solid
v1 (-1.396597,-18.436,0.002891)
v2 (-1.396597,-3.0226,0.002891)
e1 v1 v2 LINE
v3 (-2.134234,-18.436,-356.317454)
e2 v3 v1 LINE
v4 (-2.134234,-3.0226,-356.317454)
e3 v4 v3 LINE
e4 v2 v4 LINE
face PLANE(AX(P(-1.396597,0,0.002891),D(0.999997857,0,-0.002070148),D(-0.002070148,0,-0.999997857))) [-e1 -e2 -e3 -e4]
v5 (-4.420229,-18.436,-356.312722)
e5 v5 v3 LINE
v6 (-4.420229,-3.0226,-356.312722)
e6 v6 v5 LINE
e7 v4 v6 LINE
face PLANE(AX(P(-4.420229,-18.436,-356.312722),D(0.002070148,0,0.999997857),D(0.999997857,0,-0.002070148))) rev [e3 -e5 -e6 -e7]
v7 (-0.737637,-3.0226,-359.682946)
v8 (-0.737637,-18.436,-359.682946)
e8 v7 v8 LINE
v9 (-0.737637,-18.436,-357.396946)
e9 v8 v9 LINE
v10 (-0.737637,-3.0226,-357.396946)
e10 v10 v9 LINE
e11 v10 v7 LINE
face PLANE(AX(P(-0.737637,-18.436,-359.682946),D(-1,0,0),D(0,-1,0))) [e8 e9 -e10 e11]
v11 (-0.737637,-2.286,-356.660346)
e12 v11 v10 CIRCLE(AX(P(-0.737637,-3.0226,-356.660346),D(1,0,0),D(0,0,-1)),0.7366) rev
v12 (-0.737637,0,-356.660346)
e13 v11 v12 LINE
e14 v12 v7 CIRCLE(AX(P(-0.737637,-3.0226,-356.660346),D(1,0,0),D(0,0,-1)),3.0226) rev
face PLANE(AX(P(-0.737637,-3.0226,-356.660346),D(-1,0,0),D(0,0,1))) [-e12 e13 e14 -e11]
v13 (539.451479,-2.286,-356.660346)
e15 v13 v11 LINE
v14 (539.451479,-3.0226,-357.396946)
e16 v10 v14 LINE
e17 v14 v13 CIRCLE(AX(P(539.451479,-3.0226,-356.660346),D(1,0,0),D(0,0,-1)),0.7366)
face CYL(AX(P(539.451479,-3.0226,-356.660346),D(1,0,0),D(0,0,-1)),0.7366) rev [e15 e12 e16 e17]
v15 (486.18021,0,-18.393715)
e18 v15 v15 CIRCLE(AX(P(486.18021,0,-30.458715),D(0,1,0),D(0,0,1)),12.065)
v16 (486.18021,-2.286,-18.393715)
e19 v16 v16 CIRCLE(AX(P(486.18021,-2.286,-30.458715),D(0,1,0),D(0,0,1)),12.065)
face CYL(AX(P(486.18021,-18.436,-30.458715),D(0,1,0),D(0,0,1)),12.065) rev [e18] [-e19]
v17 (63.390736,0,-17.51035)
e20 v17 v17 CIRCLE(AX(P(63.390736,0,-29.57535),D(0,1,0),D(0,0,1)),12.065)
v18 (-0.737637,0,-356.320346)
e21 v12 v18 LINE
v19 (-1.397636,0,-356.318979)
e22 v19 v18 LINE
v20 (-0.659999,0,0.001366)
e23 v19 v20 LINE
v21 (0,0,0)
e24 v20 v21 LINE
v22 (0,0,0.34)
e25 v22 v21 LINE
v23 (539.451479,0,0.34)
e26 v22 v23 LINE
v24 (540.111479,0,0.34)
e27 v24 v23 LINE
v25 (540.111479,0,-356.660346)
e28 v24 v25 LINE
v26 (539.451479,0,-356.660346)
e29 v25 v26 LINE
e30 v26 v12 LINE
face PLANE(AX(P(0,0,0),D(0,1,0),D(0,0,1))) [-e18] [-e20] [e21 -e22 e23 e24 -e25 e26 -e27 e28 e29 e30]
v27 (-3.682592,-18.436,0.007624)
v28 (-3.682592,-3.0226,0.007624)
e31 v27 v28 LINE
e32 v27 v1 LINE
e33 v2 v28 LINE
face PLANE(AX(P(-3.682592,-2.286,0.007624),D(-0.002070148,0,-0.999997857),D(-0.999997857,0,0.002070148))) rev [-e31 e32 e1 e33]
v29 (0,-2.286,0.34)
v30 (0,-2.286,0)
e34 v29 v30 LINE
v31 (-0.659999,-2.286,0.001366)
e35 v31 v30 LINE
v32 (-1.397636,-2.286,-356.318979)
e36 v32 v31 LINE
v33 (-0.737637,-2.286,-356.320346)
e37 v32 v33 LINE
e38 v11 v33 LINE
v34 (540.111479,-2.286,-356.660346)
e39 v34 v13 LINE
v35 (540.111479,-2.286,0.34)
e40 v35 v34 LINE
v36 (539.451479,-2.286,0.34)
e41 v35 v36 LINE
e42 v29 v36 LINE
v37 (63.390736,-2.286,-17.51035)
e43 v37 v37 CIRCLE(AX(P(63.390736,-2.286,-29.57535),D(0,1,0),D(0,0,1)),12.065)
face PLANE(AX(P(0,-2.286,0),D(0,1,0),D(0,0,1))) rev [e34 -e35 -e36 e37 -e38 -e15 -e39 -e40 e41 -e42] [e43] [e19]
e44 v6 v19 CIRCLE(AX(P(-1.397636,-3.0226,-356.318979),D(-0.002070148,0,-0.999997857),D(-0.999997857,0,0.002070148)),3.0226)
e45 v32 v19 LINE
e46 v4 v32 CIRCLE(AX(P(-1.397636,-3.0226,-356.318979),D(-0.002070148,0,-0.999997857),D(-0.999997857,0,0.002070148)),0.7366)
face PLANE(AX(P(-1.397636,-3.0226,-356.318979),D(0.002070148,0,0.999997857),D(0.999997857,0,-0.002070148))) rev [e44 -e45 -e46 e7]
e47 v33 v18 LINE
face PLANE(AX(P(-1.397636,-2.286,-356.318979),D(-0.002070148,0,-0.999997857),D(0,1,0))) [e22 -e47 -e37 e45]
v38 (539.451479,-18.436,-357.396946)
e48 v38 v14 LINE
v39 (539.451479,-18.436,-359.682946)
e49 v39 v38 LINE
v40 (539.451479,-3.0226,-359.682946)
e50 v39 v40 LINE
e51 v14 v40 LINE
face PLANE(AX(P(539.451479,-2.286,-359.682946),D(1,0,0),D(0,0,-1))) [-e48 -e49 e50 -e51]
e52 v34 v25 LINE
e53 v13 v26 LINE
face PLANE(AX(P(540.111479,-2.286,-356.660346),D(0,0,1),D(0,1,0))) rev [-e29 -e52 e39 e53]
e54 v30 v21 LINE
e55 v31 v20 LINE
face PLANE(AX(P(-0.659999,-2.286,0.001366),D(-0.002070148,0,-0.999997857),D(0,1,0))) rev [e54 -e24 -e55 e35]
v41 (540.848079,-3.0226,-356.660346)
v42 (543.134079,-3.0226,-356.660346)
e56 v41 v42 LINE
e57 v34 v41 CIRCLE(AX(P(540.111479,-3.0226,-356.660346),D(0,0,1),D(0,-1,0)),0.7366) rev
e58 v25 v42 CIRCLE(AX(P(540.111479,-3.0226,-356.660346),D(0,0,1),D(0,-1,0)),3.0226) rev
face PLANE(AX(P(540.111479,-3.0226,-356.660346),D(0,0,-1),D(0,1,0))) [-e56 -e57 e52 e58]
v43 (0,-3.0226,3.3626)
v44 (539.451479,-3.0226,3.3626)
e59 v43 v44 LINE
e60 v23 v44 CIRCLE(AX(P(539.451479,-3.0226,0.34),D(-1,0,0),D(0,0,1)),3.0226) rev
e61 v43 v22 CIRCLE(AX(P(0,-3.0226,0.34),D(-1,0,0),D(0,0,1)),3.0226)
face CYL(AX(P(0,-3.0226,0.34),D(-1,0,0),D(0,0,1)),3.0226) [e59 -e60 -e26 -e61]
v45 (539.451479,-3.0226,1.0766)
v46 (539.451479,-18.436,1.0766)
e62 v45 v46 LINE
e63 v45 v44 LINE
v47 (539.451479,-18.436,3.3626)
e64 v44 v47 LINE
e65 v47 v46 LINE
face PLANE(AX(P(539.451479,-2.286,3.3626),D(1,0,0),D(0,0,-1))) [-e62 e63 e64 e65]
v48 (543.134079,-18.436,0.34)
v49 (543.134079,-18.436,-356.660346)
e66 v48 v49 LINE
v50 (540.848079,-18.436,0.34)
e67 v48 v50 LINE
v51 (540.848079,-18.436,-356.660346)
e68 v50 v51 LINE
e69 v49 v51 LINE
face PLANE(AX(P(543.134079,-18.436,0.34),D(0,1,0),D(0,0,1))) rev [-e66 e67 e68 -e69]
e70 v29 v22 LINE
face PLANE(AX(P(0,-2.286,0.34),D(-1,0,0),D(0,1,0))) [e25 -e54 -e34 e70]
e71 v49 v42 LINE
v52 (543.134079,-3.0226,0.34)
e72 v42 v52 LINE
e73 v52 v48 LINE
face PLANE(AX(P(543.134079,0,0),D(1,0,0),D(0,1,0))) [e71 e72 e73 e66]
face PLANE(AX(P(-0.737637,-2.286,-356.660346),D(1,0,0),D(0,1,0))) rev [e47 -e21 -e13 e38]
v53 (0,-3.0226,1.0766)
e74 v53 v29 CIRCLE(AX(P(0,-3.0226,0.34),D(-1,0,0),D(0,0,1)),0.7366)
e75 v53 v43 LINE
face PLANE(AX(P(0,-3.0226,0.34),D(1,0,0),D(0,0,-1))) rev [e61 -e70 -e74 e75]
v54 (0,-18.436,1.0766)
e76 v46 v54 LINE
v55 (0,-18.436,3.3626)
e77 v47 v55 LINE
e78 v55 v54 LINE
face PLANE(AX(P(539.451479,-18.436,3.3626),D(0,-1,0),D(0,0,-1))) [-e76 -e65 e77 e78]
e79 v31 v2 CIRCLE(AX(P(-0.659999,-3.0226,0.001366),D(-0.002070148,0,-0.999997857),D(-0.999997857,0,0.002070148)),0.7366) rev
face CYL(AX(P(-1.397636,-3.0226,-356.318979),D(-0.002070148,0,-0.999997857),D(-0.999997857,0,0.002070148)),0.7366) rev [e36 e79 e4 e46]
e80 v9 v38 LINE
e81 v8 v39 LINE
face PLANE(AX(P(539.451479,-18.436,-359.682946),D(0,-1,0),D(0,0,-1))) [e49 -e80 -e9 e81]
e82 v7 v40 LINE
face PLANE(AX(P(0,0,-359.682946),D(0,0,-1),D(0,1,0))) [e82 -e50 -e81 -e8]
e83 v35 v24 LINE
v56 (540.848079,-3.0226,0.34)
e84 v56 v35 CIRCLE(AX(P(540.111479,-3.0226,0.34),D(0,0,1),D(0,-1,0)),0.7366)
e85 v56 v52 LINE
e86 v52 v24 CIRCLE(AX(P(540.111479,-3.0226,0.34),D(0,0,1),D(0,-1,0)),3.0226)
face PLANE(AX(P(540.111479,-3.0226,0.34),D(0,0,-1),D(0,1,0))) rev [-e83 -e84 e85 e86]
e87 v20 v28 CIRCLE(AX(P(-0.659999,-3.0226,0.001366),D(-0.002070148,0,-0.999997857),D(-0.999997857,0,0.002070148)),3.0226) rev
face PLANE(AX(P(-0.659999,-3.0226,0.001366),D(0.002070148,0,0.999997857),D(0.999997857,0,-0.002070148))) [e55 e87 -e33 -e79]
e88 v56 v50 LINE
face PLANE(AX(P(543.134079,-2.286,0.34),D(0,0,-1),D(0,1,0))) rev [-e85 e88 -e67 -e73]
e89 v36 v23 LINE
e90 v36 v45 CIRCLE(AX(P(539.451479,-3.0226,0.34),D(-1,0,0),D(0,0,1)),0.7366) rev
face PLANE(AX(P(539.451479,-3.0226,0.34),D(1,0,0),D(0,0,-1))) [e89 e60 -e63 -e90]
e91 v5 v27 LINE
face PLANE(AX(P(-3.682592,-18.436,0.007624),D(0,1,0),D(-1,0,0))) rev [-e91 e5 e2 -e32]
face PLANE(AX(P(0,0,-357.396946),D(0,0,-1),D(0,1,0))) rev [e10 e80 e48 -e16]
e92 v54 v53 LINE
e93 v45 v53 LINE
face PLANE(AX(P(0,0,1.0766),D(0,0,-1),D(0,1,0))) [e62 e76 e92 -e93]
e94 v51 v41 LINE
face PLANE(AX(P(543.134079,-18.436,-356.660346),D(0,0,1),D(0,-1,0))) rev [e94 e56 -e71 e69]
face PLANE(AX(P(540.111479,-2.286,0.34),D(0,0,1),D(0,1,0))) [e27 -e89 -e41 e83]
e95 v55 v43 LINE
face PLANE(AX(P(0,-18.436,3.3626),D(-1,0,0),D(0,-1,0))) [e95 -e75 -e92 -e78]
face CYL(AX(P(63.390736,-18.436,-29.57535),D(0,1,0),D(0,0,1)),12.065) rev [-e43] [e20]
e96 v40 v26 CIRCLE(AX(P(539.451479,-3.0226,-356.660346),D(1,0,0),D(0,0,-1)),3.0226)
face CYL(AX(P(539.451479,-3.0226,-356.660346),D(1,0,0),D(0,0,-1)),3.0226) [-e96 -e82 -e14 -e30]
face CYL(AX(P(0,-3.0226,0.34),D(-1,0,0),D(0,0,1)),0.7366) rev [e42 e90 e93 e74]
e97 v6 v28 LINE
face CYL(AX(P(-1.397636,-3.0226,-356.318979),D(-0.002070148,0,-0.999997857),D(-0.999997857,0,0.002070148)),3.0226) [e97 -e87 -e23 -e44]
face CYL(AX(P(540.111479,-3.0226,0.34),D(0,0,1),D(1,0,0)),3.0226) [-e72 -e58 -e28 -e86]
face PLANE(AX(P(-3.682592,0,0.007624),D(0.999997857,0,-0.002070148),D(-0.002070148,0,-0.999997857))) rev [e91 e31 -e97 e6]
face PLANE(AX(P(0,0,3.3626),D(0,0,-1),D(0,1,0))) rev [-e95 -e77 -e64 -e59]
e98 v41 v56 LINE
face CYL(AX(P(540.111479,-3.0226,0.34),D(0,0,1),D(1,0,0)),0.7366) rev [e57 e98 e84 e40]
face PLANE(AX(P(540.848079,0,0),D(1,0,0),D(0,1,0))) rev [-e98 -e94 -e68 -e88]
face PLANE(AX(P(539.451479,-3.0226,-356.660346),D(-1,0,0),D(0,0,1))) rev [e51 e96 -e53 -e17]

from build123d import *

# Parameters (mm, degrees)
BASE_FLANGE1_DEPTH       = 2.286
EDGE_FLANGE17_DEPTH      = 540.189115874
EDGE_FLANGE17_BEND_DEPTH = 539.451478538
EDGE_FLANGE18_DEPTH      = 357.000345524
EDGE_FLANGE18_BEND_DEPTH = 356.321109034
SKETCH197_R              = 12.065
CUT_EXTRUDE1_DEPTH       = 652.69497057


# Sheet-metal steps are written as plain solids
with BuildPart() as part:
    # Sketch1 → Base-Flange1 (new body)
    with BuildSketch(Plane(origin=(0, 0, 0), x_dir=(1, 0, 0), z_dir=(0, 1, 0))):
        Polygon((539.451478538, 356.320345524), (0, 356.320345524), (-0.737637336, 356.320345524), (0, 0), (539.451478538, 0), align=None)
    extrude(amount=-BASE_FLANGE1_DEPTH)

    # Edge-Flange17 section (across the edge) → Edge-Flange17 (add)
    with BuildSketch(Plane(origin=(-0.737637336, -2.286, -357.396945524), x_dir=(0, 0, 1), z_dir=(1, 0, 0))):
        with BuildLine():
            Line((-2.286, 0.7366), (-2.286, 16.15))
            Line((-2.286, 16.15), (0, 16.15))
            Line((0, 16.15), (0, 0.7366))
            ThreePointArc((0, 0.7366), (0.215745145, 0.215745145), (0.7366, 0))
            Line((0.7366, 0), (1.0766, 0))
            Line((1.0766, 0), (1.0766, -2.286))
            Line((1.0766, -2.286), (0.7366, -2.286))
            ThreePointArc((0.7366, -2.286), (-1.400700957, -1.400700957), (-2.286, 0.7366))
        make_face()
    extrude(amount=EDGE_FLANGE17_DEPTH)

    # Edge-Flange17 section 2 (across the edge) → Edge-Flange17 bend (add)
    with BuildSketch(Plane(origin=(539.451478538, -2.286, 1.0766), x_dir=(0, 0, -1), z_dir=(-1, 0, 0))):
        with BuildLine():
            Line((-2.286, 0.7366), (-2.286, 16.15))
            Line((-2.286, 16.15), (0, 16.15))
            Line((0, 16.15), (0, 0.7366))
            ThreePointArc((0, 0.7366), (0.215745145, 0.215745145), (0.7366, 0))
            Line((0.7366, 0), (1.0766, 0))
            Line((1.0766, 0), (1.0766, -2.286))
            Line((1.0766, -2.286), (0.7366, -2.286))
            ThreePointArc((0.7366, -2.286), (-1.400700957, -1.400700957), (-2.286, 0.7366))
        make_face()
    extrude(amount=EDGE_FLANGE17_BEND_DEPTH)

    # Edge-Flange18 section (across the edge) → Edge-Flange18 (add)
    with BuildSketch(Plane(origin=(540.848078538, -2.286, -356.660345524), x_dir=(-1, 0, 0), z_dir=(0, 0, 1))):
        with BuildLine():
            Line((-2.286, 0.7366), (-2.286, 16.15))
            Line((-2.286, 16.15), (0, 16.15))
            Line((0, 16.15), (0, 0.7366))
            ThreePointArc((0, 0.7366), (0.215745145, 0.215745145), (0.7366, 0))
            Line((0.7366, 0), (1.3966, 0))
            Line((1.3966, 0), (1.3966, -2.286))
            Line((1.3966, -2.286), (0.7366, -2.286))
            ThreePointArc((0.7366, -2.286), (-1.400700957, -1.400700957), (-2.286, 0.7366))
        make_face()
    extrude(amount=EDGE_FLANGE18_DEPTH)

    # Edge-Flange18 section 2 (across the edge) → Edge-Flange18 bend (add)
    with BuildSketch(Plane(origin=(-1.396597007, -2.286, 0.002891168), x_dir=(0.9999978572418866, -3.4914813388431337e-15, -0.0020701477327567633), z_dir=(-0.0020701477327567633, 0, -0.9999978572418866))):
        with BuildLine():
            Line((-2.286, 0.7366), (-2.286, 16.15))
            Line((-2.286, 16.15), (0, 16.15))
            Line((0, 16.15), (0, 0.7366))
            ThreePointArc((0, 0.7366), (0.215745145, 0.215745145), (0.7366, 0))
            Line((0.7366, 0), (1.3966, 0))
            Line((1.3966, 0), (1.3966, -2.286))
            Line((1.3966, -2.286), (0.7366, -2.286))
            ThreePointArc((0.7366, -2.286), (-1.400700957, -1.400700957), (-2.286, 0.7366))
        make_face()
    extrude(amount=EDGE_FLANGE18_BEND_DEPTH)

    # Sketch197 → Cut-Extrude1 (cut, through all)
    with BuildSketch(Plane(origin=(0, 0, 0), x_dir=(1, 0, 0), z_dir=(0, 1, 0))):
        with Locations(Location((486.180210266, 30.458714935, 0), (0, 0, 270))):
            Circle(SKETCH197_R)
        with Locations(Location((63.390735832, 29.575349793, 0), (0, 0, 270))):
            Circle(SKETCH197_R)
    extrude(amount=-CUT_EXTRUDE1_DEPTH, mode=Mode.SUBTRACT)


solid = part.part
